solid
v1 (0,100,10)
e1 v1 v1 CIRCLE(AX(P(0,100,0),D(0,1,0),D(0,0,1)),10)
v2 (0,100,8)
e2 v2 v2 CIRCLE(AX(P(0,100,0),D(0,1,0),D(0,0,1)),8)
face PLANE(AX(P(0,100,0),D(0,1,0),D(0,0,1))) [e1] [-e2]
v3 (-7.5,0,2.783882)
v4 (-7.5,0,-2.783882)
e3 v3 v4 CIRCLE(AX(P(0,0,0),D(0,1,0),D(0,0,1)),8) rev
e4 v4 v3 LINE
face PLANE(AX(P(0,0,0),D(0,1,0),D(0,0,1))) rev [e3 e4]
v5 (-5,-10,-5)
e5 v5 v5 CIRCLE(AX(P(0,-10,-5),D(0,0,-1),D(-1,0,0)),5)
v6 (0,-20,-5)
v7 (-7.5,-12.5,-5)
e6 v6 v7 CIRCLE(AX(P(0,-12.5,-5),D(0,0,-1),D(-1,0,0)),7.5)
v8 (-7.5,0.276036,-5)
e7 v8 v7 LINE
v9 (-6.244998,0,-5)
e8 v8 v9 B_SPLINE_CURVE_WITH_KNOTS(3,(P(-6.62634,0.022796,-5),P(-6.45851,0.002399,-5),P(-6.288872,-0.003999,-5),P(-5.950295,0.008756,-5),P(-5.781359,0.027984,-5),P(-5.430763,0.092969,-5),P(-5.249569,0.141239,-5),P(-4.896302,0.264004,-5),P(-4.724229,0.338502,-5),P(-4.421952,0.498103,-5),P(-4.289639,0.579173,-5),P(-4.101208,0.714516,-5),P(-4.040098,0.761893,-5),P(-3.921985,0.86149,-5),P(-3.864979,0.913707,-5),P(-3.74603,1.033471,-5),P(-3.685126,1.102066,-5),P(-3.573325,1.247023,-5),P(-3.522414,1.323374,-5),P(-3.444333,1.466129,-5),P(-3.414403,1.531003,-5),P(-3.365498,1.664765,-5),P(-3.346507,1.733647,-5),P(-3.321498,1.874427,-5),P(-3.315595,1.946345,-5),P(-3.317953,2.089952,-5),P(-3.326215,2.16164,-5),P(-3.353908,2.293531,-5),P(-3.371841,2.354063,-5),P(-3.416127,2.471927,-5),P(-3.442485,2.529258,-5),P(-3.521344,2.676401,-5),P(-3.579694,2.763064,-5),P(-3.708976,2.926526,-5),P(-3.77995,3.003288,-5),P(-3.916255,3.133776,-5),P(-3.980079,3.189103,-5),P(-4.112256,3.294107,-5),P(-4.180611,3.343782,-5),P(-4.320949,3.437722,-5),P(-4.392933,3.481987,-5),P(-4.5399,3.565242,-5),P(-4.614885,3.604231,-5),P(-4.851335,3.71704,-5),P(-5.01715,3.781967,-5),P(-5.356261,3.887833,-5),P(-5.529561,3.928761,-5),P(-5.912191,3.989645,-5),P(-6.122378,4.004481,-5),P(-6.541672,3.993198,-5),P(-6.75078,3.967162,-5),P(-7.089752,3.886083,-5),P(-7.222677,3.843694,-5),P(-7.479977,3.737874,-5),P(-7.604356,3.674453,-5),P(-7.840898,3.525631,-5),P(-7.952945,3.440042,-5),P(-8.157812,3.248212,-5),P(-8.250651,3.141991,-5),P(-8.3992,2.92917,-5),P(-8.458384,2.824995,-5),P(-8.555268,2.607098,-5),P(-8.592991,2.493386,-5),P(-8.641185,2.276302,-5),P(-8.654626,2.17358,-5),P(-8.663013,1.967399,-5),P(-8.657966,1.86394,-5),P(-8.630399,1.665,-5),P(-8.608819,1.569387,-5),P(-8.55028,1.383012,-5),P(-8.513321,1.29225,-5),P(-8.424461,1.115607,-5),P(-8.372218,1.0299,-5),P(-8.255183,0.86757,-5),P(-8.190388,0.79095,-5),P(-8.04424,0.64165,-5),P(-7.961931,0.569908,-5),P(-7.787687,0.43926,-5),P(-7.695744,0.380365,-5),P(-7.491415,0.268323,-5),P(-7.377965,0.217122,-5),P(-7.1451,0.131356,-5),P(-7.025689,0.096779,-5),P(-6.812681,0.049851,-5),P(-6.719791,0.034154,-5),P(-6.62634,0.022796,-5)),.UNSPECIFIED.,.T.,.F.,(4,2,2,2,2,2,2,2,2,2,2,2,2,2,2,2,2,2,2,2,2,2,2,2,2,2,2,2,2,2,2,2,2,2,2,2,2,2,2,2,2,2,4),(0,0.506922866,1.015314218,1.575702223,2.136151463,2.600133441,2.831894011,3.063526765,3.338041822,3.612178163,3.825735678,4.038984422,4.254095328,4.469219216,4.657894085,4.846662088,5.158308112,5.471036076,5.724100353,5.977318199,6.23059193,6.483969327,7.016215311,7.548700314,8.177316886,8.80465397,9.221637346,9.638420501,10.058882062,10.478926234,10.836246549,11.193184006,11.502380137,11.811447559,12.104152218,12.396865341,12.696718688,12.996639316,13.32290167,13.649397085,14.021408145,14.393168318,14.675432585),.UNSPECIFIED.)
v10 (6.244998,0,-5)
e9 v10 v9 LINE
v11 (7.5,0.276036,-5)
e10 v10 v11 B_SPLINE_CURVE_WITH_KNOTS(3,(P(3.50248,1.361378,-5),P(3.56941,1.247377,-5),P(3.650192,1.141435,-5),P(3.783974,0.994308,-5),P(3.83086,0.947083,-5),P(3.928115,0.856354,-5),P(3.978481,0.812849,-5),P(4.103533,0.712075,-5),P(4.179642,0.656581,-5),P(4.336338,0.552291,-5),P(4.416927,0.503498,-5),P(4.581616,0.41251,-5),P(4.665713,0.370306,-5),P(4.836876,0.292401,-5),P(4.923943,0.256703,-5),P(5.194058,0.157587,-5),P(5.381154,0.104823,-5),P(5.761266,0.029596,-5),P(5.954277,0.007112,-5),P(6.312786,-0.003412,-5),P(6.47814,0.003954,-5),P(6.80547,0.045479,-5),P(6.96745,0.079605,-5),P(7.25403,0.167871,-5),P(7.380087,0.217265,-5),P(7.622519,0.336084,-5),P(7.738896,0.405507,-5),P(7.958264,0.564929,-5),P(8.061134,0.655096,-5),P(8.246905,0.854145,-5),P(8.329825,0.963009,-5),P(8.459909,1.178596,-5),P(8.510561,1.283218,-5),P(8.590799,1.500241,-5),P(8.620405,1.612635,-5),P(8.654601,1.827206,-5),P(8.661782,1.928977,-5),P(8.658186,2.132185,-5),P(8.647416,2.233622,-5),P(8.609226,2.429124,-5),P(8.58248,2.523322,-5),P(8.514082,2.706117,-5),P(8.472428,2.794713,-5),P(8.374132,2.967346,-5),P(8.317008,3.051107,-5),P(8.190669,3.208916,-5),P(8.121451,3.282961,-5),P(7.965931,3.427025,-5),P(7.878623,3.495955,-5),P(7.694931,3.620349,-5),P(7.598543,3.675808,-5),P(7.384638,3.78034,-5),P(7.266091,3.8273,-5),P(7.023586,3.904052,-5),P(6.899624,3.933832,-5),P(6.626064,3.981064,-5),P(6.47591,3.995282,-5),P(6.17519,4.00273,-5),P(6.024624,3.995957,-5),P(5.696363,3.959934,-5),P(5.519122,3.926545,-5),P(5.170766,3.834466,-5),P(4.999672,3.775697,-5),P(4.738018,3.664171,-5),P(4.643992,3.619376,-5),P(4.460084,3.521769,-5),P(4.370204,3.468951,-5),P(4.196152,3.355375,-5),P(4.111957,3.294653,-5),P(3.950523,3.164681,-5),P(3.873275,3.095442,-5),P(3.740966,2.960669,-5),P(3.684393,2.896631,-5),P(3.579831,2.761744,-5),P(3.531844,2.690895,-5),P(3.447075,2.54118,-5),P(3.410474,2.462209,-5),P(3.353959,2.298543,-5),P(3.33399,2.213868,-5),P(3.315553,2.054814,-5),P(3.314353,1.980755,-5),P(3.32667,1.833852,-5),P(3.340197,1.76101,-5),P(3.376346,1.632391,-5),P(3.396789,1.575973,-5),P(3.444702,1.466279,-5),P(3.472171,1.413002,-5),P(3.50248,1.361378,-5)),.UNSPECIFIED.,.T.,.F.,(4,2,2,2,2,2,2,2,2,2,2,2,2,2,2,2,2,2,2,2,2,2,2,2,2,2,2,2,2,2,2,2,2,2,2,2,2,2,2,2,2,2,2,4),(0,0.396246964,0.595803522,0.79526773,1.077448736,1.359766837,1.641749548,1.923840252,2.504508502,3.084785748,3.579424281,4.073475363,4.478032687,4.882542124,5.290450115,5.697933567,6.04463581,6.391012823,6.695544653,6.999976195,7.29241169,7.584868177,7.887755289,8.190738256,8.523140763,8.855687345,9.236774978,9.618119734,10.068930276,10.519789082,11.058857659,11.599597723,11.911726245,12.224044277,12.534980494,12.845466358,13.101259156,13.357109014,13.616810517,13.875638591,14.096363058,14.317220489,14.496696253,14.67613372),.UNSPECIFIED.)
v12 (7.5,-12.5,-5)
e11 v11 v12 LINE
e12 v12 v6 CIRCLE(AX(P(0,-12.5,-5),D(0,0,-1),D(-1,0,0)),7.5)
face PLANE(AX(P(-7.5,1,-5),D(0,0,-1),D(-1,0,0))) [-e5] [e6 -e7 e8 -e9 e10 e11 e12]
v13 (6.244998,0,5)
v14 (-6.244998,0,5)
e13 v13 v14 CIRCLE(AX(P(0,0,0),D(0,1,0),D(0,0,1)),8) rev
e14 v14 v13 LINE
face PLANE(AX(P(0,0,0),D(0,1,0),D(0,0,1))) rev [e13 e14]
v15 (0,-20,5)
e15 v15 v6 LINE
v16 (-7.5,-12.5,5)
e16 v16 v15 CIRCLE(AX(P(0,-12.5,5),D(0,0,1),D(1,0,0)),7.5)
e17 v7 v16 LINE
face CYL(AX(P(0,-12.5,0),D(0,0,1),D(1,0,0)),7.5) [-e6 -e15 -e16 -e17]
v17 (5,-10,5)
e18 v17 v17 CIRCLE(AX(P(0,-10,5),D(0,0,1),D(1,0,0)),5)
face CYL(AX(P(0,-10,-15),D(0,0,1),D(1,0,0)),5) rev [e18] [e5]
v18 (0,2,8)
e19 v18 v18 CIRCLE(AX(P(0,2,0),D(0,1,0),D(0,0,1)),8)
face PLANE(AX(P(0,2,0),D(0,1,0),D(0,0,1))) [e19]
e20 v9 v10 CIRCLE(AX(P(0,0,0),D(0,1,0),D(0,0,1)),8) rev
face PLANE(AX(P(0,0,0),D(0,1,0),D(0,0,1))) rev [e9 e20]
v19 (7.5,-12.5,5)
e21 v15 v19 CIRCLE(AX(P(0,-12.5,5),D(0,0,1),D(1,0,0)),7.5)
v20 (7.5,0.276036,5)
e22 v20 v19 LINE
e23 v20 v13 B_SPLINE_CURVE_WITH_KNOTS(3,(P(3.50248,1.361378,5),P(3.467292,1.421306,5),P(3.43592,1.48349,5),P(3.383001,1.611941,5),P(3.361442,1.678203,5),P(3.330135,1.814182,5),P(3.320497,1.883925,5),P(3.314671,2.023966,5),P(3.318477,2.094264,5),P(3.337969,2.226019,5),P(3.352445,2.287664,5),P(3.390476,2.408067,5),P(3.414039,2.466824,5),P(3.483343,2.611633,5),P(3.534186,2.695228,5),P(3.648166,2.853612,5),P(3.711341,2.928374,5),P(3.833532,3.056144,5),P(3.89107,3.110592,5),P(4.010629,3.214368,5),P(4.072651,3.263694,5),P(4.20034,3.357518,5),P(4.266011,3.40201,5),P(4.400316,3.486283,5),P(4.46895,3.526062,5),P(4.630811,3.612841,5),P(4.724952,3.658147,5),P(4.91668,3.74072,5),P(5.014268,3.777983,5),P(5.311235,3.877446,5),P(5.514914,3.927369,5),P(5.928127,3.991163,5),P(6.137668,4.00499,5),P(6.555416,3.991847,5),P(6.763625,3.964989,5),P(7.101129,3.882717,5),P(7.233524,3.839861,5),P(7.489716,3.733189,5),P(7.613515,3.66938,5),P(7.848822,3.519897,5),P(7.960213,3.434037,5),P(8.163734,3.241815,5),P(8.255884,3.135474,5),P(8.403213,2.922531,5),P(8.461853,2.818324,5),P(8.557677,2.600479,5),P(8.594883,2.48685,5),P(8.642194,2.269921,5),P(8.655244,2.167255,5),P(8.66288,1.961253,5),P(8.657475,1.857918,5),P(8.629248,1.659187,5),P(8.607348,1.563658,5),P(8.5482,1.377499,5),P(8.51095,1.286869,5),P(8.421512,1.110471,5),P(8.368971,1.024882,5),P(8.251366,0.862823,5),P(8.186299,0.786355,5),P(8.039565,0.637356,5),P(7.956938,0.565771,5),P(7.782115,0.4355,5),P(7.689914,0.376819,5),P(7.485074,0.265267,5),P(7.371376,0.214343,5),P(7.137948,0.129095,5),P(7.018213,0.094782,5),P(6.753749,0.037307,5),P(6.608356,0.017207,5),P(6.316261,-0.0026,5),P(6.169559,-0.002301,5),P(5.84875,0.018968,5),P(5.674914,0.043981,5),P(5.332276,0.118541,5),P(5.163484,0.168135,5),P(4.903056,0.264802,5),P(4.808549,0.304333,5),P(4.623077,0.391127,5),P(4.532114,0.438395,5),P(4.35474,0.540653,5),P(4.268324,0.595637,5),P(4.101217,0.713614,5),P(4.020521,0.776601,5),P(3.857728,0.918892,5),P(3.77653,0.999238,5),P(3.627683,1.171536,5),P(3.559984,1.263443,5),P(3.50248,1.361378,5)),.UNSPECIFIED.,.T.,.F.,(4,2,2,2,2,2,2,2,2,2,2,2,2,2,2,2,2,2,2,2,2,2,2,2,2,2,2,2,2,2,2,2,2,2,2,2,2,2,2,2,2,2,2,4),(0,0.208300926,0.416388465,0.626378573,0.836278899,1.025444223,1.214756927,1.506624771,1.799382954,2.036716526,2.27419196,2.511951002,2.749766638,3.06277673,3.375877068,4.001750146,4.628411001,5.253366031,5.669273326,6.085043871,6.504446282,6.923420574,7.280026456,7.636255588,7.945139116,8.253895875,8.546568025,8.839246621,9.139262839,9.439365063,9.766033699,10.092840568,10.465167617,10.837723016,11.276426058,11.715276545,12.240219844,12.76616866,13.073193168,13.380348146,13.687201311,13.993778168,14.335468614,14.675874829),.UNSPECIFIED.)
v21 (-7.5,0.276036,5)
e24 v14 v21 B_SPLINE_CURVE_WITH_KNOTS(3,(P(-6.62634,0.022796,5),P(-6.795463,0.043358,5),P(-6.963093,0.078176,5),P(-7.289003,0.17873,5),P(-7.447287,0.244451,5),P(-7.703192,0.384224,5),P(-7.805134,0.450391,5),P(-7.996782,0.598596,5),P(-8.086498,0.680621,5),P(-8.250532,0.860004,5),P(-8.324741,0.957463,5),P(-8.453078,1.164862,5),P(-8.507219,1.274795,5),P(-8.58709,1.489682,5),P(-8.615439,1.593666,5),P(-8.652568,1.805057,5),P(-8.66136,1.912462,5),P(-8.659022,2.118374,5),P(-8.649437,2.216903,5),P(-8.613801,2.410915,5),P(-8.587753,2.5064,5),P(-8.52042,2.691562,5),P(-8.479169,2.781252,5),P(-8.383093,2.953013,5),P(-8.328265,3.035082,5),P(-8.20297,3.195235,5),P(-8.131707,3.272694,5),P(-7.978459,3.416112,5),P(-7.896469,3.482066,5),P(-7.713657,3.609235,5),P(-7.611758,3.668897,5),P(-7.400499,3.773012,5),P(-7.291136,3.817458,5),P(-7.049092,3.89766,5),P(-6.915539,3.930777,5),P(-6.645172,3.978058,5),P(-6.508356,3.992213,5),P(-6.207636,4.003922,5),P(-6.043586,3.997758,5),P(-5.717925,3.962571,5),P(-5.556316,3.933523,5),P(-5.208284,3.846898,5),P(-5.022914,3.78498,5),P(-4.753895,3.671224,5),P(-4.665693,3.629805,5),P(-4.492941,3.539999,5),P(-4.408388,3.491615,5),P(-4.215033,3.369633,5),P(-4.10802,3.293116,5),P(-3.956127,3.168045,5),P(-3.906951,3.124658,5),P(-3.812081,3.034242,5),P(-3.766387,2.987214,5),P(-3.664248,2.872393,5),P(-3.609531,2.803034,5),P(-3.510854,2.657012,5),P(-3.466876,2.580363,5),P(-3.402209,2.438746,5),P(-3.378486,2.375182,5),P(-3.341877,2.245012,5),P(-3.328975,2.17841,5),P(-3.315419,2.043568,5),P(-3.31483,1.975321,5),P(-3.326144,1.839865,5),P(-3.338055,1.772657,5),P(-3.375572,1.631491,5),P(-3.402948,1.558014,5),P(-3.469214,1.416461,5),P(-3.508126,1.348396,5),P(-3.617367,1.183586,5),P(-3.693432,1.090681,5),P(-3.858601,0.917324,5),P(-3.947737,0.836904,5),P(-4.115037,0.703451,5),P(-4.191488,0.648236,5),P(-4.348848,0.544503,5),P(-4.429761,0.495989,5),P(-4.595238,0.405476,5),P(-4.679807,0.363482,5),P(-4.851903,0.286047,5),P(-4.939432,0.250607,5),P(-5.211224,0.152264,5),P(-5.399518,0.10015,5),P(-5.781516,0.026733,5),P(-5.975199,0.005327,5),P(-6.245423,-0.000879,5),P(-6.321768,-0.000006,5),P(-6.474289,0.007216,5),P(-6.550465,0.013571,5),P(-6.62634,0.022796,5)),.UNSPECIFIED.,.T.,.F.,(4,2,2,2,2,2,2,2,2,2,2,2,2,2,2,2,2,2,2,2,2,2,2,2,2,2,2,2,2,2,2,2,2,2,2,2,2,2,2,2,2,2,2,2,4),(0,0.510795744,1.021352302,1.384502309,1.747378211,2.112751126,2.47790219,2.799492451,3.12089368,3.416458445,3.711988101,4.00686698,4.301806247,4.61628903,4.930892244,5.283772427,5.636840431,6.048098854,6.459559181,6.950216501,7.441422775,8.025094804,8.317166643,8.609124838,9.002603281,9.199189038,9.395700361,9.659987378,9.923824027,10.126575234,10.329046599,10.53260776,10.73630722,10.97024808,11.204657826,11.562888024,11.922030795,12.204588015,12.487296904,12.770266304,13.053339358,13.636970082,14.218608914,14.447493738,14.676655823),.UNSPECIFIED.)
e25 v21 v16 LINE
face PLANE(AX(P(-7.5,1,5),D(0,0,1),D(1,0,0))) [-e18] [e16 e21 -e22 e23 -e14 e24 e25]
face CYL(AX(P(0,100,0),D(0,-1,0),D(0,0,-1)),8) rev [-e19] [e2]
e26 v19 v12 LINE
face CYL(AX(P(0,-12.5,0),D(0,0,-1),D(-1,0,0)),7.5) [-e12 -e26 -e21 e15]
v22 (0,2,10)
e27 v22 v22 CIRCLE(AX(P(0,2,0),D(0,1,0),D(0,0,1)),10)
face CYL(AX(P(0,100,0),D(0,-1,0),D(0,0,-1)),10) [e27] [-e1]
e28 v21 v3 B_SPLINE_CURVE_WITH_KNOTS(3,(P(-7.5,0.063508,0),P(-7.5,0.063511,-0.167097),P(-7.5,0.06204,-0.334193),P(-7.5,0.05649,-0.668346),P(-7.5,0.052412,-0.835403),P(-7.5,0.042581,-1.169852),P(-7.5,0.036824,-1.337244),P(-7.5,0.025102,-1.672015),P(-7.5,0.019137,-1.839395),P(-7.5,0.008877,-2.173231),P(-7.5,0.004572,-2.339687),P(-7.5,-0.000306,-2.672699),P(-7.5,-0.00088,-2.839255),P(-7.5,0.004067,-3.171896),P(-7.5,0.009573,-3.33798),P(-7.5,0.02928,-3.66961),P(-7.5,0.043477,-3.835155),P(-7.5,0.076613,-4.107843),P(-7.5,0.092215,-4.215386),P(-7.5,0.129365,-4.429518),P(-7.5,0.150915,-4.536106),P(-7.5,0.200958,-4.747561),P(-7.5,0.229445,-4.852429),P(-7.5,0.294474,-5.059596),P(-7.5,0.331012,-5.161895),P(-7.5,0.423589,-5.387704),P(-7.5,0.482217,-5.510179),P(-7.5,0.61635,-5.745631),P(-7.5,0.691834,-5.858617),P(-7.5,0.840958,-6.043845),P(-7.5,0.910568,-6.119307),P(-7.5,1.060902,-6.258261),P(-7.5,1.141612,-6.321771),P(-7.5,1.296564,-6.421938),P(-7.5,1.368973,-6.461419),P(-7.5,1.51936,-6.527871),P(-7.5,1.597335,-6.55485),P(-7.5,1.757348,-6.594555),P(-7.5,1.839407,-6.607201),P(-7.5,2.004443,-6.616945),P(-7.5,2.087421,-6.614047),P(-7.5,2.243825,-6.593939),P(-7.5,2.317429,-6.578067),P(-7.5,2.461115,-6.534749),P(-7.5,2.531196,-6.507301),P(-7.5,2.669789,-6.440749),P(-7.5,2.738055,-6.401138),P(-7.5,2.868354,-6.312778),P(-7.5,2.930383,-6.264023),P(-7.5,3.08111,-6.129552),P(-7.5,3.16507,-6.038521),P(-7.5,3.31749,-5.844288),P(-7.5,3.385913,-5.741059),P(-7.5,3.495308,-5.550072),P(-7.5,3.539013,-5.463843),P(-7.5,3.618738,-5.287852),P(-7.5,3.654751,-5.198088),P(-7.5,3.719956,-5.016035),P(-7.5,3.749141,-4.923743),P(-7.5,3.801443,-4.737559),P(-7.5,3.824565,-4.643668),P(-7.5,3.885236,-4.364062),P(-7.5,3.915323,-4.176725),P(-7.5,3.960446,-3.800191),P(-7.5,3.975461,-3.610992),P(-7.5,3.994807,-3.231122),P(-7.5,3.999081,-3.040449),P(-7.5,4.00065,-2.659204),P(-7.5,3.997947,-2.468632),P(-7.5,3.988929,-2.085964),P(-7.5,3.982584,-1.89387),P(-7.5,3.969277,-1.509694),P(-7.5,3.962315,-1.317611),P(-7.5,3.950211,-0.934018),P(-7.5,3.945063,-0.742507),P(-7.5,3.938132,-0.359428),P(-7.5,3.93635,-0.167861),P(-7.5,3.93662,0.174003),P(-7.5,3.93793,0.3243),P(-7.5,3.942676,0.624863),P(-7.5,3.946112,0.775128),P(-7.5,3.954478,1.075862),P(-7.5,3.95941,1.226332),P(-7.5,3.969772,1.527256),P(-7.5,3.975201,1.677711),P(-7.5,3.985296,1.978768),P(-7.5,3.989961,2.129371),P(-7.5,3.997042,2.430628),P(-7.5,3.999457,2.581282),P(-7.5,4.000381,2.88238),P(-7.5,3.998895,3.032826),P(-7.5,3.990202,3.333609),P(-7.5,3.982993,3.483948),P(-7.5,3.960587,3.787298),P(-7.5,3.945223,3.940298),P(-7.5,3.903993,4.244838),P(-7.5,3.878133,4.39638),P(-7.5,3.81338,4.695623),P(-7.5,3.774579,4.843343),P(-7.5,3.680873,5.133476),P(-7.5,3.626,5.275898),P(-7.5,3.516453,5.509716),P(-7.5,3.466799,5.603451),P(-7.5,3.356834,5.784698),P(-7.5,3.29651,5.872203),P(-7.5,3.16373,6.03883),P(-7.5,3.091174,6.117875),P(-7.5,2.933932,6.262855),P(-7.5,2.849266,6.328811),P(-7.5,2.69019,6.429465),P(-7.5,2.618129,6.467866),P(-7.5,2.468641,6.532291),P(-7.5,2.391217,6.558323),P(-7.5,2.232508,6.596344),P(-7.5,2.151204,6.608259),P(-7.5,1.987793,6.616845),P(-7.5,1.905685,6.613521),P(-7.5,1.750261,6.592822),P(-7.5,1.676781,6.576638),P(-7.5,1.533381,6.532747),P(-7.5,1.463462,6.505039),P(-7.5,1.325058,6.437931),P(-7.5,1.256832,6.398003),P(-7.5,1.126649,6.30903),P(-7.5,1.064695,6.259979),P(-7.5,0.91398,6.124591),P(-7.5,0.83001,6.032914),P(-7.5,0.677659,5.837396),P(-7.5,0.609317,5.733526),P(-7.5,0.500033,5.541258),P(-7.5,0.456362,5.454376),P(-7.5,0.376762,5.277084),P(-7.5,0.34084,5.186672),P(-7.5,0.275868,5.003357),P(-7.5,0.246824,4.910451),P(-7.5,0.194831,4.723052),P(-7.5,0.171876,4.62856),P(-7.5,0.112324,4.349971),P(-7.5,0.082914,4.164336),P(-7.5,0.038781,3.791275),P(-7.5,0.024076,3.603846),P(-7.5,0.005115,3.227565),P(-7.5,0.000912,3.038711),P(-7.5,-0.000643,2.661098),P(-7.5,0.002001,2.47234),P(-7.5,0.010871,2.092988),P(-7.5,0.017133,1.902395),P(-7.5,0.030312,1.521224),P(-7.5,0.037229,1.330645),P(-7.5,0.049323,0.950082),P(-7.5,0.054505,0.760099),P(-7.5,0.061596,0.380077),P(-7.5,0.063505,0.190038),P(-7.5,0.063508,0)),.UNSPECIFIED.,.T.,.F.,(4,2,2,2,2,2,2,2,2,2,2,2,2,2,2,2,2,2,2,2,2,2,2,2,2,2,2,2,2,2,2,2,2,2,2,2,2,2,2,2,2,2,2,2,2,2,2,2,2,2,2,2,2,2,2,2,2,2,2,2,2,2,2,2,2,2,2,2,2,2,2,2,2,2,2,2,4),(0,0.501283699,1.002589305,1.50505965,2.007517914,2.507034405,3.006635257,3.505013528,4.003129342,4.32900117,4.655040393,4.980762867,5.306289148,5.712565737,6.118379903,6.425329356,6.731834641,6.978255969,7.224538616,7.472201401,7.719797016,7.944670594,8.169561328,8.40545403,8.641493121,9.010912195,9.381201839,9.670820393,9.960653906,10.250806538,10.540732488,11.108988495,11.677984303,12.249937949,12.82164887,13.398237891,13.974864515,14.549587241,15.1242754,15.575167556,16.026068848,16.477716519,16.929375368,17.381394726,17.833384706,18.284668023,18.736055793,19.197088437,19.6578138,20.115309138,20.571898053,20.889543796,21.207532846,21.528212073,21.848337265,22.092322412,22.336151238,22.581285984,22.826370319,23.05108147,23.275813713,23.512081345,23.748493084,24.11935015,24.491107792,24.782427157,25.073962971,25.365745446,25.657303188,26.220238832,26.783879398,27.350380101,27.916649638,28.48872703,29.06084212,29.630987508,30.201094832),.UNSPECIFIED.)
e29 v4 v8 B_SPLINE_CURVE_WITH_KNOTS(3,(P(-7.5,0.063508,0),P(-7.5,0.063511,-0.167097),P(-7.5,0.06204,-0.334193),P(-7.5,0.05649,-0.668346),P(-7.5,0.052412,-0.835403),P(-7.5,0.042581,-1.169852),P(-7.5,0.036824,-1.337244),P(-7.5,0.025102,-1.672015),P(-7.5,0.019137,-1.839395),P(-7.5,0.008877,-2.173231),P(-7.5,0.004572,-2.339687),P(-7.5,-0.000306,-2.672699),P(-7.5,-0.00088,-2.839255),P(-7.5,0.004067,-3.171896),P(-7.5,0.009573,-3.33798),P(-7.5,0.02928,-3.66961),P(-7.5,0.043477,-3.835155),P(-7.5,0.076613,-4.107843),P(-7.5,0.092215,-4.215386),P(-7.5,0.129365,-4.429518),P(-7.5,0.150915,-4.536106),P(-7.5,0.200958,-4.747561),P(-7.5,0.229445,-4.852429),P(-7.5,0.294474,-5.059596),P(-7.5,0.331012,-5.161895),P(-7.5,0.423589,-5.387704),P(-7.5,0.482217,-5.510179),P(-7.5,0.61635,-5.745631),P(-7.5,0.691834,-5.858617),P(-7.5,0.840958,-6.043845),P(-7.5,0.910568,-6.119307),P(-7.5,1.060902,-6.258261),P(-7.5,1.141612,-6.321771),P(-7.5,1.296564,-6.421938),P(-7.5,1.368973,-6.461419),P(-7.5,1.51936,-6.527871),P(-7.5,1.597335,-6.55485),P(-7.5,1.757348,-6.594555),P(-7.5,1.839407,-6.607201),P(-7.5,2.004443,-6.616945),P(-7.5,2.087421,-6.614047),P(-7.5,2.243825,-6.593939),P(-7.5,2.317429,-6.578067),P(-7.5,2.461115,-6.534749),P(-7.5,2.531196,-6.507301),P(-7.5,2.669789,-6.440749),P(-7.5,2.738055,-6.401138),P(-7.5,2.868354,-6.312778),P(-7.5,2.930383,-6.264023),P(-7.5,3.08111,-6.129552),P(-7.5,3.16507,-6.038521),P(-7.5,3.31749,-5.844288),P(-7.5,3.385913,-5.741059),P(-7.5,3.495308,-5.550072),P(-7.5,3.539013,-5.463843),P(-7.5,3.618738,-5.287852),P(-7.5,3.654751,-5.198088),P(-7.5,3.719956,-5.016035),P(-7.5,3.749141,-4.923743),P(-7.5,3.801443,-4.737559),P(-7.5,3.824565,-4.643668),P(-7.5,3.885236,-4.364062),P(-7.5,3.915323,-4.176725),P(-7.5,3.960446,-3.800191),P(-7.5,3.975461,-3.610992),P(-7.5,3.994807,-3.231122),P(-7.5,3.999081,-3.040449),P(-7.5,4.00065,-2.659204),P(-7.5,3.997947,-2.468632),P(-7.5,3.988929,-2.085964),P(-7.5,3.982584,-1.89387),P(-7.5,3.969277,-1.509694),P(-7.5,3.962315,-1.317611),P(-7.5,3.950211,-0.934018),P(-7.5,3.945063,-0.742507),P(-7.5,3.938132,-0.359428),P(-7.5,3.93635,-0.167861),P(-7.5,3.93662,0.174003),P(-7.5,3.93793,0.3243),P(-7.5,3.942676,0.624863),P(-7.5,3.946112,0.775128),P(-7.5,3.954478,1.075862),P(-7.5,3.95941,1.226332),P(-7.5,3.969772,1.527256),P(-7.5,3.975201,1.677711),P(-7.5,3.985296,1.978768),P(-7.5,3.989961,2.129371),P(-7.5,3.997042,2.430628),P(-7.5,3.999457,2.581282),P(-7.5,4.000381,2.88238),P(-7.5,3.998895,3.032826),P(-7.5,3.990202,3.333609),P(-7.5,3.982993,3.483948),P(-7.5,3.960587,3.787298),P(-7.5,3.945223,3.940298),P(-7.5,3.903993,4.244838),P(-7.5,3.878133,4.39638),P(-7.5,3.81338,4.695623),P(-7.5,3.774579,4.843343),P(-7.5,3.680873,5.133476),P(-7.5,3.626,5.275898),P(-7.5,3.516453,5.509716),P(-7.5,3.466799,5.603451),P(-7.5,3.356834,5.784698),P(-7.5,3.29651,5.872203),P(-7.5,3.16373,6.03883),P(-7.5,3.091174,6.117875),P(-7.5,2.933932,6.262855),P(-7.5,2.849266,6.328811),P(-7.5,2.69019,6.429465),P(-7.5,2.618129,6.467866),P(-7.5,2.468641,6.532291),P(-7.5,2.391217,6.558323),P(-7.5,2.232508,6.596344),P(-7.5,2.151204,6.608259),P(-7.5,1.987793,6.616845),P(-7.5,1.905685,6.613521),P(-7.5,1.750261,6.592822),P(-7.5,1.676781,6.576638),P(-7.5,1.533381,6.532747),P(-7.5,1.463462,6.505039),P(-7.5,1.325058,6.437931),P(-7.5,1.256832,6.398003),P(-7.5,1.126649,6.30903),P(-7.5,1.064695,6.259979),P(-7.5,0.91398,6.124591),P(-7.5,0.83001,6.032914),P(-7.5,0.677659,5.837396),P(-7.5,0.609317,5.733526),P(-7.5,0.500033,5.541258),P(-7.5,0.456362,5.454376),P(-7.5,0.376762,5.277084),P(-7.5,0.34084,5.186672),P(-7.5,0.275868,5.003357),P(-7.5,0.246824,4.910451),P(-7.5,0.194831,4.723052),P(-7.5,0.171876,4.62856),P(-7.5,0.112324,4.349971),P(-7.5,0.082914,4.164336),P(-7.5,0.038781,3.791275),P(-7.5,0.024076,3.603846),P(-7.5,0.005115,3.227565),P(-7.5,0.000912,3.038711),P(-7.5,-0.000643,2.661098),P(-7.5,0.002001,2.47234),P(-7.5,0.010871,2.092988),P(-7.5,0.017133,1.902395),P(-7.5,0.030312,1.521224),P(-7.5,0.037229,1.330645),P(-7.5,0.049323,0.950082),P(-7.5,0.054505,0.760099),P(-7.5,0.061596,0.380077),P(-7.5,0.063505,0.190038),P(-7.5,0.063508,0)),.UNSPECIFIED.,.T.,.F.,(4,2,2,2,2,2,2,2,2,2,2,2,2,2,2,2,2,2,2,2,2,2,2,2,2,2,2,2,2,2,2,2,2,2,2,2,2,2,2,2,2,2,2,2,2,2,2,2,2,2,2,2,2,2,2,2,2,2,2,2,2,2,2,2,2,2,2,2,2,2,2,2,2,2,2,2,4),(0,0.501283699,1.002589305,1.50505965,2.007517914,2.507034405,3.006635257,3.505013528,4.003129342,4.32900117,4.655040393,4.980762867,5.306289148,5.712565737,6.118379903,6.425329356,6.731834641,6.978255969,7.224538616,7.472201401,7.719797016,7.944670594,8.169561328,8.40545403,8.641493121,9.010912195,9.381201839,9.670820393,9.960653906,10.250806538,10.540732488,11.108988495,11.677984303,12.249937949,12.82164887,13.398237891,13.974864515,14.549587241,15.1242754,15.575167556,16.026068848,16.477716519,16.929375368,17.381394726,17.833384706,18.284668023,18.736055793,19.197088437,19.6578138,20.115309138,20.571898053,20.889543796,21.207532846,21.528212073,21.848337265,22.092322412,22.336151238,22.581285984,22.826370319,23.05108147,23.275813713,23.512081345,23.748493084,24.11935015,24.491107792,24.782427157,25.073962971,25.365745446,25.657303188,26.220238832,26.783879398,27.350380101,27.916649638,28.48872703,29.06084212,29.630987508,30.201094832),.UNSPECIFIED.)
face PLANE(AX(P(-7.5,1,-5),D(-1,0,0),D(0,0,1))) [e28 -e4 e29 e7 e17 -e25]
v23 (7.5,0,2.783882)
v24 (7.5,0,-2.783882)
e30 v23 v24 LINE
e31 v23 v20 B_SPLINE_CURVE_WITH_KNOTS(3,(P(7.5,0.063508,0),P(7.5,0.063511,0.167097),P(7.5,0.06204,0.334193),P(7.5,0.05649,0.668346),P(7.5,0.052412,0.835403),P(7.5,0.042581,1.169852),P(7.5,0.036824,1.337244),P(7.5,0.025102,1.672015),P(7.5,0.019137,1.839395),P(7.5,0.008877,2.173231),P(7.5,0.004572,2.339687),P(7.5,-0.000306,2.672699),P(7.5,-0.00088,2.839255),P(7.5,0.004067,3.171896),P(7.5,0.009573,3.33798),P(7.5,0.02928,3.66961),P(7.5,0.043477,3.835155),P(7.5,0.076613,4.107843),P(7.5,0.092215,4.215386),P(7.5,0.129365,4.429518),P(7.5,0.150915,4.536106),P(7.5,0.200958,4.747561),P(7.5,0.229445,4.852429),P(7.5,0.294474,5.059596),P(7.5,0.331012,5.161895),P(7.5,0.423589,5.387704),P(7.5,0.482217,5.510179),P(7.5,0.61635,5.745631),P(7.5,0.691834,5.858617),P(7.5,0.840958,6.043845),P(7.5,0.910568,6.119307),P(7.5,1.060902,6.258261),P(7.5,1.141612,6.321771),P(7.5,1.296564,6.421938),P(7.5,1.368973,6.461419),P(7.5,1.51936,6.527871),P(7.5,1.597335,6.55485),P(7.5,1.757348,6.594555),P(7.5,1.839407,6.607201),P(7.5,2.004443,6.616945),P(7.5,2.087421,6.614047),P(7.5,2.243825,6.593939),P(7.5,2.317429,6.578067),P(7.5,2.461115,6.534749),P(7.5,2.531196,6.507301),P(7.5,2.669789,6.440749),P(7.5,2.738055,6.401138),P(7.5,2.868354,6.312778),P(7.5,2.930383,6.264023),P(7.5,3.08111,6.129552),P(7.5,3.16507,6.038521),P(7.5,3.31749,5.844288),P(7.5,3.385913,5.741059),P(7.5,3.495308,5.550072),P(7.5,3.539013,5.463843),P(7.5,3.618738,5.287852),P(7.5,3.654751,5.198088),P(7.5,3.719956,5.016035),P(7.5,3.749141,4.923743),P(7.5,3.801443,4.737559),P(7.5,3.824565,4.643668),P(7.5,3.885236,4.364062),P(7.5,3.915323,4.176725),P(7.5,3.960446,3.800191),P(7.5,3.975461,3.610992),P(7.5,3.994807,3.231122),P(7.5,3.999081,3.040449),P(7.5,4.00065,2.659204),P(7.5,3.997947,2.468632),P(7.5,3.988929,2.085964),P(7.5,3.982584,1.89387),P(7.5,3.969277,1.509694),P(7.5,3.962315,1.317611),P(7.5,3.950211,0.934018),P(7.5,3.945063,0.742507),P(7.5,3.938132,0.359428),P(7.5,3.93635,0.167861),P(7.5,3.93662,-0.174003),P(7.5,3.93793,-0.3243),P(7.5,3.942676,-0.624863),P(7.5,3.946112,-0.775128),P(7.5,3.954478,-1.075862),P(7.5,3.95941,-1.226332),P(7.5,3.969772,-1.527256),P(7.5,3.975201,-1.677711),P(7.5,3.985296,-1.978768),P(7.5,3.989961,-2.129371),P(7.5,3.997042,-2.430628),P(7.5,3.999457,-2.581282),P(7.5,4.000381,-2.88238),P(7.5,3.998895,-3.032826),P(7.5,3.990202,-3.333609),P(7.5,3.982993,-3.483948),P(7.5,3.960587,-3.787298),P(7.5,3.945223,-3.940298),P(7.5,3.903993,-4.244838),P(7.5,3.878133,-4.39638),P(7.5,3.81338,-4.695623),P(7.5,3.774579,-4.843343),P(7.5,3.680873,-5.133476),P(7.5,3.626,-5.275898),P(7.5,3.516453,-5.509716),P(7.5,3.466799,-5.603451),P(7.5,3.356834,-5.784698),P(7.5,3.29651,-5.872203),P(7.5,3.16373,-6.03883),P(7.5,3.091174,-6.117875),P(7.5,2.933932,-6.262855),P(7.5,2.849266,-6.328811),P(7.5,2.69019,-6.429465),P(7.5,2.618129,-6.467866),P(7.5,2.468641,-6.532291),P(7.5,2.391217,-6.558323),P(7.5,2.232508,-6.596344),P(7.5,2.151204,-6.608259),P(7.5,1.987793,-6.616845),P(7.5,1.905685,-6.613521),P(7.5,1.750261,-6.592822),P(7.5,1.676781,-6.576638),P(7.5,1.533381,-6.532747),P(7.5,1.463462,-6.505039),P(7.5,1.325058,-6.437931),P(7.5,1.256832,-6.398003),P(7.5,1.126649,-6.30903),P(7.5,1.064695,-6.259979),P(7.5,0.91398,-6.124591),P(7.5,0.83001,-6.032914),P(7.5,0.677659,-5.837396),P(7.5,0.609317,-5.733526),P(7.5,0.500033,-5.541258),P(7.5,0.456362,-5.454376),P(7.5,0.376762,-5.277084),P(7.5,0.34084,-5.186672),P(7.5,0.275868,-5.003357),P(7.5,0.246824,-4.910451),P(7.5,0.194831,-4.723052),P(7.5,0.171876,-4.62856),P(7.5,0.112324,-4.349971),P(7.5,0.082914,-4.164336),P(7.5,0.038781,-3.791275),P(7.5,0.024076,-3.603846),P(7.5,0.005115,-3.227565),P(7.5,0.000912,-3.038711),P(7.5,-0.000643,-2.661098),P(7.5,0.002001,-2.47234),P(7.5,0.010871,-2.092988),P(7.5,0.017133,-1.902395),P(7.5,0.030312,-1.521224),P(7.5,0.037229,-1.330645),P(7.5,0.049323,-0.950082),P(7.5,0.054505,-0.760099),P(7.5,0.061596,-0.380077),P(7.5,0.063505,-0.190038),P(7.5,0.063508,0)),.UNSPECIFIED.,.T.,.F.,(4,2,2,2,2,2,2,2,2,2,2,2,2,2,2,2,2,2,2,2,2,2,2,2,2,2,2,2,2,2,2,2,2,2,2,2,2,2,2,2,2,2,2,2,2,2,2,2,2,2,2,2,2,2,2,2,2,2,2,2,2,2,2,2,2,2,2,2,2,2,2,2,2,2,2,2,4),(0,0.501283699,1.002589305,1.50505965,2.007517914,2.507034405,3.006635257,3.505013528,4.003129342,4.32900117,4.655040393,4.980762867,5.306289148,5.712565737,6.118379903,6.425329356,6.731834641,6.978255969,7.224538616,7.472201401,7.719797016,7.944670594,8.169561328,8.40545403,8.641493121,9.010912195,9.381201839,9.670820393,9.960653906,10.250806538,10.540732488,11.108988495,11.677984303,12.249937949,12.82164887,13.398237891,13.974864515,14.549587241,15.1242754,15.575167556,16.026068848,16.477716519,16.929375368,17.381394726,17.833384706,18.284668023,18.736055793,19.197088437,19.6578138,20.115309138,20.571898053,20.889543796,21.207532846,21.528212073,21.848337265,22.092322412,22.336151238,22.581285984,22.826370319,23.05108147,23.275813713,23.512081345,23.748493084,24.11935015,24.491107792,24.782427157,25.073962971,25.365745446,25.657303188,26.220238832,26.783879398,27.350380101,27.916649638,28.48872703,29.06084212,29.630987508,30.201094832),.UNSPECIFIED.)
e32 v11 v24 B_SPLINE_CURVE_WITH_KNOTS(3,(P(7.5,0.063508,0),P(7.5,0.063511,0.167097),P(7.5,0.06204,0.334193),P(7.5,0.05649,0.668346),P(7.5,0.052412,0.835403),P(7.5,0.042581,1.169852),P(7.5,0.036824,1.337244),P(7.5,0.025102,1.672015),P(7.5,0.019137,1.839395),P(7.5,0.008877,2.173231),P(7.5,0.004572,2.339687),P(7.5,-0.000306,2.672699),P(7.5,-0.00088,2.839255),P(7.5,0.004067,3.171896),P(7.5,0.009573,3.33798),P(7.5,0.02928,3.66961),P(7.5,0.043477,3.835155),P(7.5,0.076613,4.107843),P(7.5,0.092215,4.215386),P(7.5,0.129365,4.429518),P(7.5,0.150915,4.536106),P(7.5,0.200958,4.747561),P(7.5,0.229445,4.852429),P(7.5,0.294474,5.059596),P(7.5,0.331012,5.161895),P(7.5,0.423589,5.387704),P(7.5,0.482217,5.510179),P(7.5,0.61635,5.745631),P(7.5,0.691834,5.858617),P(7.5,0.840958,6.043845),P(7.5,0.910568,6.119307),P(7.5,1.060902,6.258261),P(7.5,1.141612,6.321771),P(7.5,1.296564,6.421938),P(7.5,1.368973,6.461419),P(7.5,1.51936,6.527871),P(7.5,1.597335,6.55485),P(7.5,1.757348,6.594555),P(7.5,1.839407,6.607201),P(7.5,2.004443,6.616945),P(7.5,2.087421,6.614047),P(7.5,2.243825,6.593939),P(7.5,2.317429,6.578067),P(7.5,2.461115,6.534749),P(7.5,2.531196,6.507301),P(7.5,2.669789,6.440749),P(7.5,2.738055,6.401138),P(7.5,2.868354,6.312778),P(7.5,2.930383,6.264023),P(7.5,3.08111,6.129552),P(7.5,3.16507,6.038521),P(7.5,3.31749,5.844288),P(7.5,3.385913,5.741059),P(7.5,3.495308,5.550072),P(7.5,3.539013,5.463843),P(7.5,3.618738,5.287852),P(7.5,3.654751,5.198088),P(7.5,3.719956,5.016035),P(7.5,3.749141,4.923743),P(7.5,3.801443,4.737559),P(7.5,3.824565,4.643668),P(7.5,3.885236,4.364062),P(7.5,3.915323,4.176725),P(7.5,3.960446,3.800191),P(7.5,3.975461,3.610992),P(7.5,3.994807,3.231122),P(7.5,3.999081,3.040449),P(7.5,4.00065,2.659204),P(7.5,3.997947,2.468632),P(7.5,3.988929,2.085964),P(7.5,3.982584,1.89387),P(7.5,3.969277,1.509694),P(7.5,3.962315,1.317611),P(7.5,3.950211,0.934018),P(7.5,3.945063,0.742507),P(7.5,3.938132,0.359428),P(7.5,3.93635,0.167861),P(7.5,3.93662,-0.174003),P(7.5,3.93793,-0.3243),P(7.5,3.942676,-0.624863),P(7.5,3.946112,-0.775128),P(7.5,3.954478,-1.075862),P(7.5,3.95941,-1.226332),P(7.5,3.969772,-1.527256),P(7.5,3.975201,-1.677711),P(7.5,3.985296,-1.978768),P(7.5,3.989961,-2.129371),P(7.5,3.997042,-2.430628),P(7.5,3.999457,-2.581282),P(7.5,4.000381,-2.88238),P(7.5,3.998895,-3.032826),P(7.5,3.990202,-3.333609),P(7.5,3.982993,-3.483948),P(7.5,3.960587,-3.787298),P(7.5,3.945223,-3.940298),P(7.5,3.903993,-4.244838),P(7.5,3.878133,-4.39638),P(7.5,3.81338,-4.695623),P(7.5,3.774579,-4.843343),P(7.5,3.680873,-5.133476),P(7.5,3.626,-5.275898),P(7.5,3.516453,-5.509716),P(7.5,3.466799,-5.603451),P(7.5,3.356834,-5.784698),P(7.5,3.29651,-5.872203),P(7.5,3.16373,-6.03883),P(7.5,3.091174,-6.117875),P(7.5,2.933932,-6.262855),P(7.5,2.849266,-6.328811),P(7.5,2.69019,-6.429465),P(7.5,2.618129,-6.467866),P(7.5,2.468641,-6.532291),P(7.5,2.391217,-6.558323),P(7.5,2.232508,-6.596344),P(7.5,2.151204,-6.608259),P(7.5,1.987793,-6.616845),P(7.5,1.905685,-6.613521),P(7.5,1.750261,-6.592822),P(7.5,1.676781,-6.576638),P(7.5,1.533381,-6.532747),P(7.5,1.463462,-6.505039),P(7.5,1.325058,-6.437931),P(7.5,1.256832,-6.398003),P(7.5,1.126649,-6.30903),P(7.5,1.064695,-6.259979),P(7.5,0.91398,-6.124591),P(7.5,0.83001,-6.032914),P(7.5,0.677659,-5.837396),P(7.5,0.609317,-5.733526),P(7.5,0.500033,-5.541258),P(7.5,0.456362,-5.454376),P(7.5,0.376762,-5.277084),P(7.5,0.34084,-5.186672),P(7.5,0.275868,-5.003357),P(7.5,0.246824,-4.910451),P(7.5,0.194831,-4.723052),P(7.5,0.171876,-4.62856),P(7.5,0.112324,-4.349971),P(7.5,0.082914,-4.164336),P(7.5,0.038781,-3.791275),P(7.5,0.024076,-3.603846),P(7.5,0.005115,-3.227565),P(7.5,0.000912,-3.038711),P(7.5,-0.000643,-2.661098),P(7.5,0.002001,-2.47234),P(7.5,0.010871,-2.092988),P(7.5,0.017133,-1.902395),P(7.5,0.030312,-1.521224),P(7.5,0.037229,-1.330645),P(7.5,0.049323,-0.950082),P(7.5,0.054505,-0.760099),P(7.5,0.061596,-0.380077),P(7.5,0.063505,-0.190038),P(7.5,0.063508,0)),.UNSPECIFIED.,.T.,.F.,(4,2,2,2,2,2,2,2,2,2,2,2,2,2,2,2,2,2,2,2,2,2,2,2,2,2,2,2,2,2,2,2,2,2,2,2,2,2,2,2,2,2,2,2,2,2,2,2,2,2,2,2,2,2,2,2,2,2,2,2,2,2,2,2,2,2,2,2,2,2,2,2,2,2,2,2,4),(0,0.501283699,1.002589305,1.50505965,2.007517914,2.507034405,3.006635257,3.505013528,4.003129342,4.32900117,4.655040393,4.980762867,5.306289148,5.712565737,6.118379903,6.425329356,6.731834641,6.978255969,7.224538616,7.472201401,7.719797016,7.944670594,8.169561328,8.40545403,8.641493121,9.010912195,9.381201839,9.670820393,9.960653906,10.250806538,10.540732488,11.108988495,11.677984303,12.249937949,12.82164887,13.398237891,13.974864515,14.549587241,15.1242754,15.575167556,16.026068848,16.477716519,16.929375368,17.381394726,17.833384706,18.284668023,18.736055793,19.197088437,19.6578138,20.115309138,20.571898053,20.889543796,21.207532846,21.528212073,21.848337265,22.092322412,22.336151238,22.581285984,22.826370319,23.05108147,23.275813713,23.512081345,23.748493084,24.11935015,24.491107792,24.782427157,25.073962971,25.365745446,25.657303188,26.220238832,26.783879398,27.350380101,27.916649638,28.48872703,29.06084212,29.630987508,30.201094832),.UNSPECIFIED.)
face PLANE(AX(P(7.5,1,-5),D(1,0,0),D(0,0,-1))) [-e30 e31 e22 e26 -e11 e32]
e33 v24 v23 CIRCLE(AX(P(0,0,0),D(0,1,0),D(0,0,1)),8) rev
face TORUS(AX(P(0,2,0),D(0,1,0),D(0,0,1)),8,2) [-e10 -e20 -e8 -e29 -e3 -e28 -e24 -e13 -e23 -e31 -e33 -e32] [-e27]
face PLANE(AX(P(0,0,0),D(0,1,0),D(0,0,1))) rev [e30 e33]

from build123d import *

# Parameters (mm, degrees)
SKETCH1_R                = 10
BOSS_EXTRUDE1_DEPTH      = 100
SHELL1_T                 = -2
FILLET1_R                = 2
BOSS_EXTRUDE2_DEPTH      = 20
BOSS_EXTRUDE2_DEPTH_BACK = 1
SKETCH2_W                = 15
SKETCH2_H                = 10
SKETCH3_R                = 5
CUT_EXTRUDE1_DEPTH       = 20
FILLET2_R                = 7.5


with BuildPart() as part:
    # Sketch1 → Boss-Extrude1 (new body)
    with BuildSketch(Plane(origin=(0, 0, 0), x_dir=(1, 0, 0), z_dir=(0, 1, 0))):
        with Locations(Location((0, 0, 0), (0, 0, 270))):
            Circle(SKETCH1_R)
    extrude(amount=BOSS_EXTRUDE1_DEPTH)

    # Shell1
    shell1_openings = [part.faces().sort_by_distance(p)[0] for p in [
        (0, 100, 0),
    ]]
    offset(amount=SHELL1_T, openings=shell1_openings, kind=Kind.INTERSECTION)

    # Fillet1
    fillet1_edges = [part.edges().sort_by_distance(p)[0] for p in [
        (0, 0, -10),
    ]]
    fillet(fillet1_edges, radius=FILLET1_R)

    # Sketch2 → Boss-Extrude2 (add, two sides: drawn at the far end of the back side and taken through both)
    with BuildSketch(Plane.XZ.offset(-BOSS_EXTRUDE2_DEPTH_BACK)):
        Rectangle(SKETCH2_W, SKETCH2_H)
    extrude(amount=BOSS_EXTRUDE2_DEPTH + BOSS_EXTRUDE2_DEPTH_BACK)

    # Sketch3 → Cut-Extrude1 (cut)
    with BuildSketch(Plane.XY.offset(5)):
        with Locations((0, -10)):
            Circle(SKETCH3_R)
    extrude(amount=-CUT_EXTRUDE1_DEPTH, mode=Mode.SUBTRACT)

    # Fillet2
    fillet2_edges = [part.edges().sort_by_distance(p)[0] for p in [
        (7.5, -20, 0),
        (-7.5, -20, 0),
    ]]
    fillet(fillet2_edges, radius=FILLET2_R - 0.0001)  # a hair under: the kernel refuses the full size


solid = part.part
